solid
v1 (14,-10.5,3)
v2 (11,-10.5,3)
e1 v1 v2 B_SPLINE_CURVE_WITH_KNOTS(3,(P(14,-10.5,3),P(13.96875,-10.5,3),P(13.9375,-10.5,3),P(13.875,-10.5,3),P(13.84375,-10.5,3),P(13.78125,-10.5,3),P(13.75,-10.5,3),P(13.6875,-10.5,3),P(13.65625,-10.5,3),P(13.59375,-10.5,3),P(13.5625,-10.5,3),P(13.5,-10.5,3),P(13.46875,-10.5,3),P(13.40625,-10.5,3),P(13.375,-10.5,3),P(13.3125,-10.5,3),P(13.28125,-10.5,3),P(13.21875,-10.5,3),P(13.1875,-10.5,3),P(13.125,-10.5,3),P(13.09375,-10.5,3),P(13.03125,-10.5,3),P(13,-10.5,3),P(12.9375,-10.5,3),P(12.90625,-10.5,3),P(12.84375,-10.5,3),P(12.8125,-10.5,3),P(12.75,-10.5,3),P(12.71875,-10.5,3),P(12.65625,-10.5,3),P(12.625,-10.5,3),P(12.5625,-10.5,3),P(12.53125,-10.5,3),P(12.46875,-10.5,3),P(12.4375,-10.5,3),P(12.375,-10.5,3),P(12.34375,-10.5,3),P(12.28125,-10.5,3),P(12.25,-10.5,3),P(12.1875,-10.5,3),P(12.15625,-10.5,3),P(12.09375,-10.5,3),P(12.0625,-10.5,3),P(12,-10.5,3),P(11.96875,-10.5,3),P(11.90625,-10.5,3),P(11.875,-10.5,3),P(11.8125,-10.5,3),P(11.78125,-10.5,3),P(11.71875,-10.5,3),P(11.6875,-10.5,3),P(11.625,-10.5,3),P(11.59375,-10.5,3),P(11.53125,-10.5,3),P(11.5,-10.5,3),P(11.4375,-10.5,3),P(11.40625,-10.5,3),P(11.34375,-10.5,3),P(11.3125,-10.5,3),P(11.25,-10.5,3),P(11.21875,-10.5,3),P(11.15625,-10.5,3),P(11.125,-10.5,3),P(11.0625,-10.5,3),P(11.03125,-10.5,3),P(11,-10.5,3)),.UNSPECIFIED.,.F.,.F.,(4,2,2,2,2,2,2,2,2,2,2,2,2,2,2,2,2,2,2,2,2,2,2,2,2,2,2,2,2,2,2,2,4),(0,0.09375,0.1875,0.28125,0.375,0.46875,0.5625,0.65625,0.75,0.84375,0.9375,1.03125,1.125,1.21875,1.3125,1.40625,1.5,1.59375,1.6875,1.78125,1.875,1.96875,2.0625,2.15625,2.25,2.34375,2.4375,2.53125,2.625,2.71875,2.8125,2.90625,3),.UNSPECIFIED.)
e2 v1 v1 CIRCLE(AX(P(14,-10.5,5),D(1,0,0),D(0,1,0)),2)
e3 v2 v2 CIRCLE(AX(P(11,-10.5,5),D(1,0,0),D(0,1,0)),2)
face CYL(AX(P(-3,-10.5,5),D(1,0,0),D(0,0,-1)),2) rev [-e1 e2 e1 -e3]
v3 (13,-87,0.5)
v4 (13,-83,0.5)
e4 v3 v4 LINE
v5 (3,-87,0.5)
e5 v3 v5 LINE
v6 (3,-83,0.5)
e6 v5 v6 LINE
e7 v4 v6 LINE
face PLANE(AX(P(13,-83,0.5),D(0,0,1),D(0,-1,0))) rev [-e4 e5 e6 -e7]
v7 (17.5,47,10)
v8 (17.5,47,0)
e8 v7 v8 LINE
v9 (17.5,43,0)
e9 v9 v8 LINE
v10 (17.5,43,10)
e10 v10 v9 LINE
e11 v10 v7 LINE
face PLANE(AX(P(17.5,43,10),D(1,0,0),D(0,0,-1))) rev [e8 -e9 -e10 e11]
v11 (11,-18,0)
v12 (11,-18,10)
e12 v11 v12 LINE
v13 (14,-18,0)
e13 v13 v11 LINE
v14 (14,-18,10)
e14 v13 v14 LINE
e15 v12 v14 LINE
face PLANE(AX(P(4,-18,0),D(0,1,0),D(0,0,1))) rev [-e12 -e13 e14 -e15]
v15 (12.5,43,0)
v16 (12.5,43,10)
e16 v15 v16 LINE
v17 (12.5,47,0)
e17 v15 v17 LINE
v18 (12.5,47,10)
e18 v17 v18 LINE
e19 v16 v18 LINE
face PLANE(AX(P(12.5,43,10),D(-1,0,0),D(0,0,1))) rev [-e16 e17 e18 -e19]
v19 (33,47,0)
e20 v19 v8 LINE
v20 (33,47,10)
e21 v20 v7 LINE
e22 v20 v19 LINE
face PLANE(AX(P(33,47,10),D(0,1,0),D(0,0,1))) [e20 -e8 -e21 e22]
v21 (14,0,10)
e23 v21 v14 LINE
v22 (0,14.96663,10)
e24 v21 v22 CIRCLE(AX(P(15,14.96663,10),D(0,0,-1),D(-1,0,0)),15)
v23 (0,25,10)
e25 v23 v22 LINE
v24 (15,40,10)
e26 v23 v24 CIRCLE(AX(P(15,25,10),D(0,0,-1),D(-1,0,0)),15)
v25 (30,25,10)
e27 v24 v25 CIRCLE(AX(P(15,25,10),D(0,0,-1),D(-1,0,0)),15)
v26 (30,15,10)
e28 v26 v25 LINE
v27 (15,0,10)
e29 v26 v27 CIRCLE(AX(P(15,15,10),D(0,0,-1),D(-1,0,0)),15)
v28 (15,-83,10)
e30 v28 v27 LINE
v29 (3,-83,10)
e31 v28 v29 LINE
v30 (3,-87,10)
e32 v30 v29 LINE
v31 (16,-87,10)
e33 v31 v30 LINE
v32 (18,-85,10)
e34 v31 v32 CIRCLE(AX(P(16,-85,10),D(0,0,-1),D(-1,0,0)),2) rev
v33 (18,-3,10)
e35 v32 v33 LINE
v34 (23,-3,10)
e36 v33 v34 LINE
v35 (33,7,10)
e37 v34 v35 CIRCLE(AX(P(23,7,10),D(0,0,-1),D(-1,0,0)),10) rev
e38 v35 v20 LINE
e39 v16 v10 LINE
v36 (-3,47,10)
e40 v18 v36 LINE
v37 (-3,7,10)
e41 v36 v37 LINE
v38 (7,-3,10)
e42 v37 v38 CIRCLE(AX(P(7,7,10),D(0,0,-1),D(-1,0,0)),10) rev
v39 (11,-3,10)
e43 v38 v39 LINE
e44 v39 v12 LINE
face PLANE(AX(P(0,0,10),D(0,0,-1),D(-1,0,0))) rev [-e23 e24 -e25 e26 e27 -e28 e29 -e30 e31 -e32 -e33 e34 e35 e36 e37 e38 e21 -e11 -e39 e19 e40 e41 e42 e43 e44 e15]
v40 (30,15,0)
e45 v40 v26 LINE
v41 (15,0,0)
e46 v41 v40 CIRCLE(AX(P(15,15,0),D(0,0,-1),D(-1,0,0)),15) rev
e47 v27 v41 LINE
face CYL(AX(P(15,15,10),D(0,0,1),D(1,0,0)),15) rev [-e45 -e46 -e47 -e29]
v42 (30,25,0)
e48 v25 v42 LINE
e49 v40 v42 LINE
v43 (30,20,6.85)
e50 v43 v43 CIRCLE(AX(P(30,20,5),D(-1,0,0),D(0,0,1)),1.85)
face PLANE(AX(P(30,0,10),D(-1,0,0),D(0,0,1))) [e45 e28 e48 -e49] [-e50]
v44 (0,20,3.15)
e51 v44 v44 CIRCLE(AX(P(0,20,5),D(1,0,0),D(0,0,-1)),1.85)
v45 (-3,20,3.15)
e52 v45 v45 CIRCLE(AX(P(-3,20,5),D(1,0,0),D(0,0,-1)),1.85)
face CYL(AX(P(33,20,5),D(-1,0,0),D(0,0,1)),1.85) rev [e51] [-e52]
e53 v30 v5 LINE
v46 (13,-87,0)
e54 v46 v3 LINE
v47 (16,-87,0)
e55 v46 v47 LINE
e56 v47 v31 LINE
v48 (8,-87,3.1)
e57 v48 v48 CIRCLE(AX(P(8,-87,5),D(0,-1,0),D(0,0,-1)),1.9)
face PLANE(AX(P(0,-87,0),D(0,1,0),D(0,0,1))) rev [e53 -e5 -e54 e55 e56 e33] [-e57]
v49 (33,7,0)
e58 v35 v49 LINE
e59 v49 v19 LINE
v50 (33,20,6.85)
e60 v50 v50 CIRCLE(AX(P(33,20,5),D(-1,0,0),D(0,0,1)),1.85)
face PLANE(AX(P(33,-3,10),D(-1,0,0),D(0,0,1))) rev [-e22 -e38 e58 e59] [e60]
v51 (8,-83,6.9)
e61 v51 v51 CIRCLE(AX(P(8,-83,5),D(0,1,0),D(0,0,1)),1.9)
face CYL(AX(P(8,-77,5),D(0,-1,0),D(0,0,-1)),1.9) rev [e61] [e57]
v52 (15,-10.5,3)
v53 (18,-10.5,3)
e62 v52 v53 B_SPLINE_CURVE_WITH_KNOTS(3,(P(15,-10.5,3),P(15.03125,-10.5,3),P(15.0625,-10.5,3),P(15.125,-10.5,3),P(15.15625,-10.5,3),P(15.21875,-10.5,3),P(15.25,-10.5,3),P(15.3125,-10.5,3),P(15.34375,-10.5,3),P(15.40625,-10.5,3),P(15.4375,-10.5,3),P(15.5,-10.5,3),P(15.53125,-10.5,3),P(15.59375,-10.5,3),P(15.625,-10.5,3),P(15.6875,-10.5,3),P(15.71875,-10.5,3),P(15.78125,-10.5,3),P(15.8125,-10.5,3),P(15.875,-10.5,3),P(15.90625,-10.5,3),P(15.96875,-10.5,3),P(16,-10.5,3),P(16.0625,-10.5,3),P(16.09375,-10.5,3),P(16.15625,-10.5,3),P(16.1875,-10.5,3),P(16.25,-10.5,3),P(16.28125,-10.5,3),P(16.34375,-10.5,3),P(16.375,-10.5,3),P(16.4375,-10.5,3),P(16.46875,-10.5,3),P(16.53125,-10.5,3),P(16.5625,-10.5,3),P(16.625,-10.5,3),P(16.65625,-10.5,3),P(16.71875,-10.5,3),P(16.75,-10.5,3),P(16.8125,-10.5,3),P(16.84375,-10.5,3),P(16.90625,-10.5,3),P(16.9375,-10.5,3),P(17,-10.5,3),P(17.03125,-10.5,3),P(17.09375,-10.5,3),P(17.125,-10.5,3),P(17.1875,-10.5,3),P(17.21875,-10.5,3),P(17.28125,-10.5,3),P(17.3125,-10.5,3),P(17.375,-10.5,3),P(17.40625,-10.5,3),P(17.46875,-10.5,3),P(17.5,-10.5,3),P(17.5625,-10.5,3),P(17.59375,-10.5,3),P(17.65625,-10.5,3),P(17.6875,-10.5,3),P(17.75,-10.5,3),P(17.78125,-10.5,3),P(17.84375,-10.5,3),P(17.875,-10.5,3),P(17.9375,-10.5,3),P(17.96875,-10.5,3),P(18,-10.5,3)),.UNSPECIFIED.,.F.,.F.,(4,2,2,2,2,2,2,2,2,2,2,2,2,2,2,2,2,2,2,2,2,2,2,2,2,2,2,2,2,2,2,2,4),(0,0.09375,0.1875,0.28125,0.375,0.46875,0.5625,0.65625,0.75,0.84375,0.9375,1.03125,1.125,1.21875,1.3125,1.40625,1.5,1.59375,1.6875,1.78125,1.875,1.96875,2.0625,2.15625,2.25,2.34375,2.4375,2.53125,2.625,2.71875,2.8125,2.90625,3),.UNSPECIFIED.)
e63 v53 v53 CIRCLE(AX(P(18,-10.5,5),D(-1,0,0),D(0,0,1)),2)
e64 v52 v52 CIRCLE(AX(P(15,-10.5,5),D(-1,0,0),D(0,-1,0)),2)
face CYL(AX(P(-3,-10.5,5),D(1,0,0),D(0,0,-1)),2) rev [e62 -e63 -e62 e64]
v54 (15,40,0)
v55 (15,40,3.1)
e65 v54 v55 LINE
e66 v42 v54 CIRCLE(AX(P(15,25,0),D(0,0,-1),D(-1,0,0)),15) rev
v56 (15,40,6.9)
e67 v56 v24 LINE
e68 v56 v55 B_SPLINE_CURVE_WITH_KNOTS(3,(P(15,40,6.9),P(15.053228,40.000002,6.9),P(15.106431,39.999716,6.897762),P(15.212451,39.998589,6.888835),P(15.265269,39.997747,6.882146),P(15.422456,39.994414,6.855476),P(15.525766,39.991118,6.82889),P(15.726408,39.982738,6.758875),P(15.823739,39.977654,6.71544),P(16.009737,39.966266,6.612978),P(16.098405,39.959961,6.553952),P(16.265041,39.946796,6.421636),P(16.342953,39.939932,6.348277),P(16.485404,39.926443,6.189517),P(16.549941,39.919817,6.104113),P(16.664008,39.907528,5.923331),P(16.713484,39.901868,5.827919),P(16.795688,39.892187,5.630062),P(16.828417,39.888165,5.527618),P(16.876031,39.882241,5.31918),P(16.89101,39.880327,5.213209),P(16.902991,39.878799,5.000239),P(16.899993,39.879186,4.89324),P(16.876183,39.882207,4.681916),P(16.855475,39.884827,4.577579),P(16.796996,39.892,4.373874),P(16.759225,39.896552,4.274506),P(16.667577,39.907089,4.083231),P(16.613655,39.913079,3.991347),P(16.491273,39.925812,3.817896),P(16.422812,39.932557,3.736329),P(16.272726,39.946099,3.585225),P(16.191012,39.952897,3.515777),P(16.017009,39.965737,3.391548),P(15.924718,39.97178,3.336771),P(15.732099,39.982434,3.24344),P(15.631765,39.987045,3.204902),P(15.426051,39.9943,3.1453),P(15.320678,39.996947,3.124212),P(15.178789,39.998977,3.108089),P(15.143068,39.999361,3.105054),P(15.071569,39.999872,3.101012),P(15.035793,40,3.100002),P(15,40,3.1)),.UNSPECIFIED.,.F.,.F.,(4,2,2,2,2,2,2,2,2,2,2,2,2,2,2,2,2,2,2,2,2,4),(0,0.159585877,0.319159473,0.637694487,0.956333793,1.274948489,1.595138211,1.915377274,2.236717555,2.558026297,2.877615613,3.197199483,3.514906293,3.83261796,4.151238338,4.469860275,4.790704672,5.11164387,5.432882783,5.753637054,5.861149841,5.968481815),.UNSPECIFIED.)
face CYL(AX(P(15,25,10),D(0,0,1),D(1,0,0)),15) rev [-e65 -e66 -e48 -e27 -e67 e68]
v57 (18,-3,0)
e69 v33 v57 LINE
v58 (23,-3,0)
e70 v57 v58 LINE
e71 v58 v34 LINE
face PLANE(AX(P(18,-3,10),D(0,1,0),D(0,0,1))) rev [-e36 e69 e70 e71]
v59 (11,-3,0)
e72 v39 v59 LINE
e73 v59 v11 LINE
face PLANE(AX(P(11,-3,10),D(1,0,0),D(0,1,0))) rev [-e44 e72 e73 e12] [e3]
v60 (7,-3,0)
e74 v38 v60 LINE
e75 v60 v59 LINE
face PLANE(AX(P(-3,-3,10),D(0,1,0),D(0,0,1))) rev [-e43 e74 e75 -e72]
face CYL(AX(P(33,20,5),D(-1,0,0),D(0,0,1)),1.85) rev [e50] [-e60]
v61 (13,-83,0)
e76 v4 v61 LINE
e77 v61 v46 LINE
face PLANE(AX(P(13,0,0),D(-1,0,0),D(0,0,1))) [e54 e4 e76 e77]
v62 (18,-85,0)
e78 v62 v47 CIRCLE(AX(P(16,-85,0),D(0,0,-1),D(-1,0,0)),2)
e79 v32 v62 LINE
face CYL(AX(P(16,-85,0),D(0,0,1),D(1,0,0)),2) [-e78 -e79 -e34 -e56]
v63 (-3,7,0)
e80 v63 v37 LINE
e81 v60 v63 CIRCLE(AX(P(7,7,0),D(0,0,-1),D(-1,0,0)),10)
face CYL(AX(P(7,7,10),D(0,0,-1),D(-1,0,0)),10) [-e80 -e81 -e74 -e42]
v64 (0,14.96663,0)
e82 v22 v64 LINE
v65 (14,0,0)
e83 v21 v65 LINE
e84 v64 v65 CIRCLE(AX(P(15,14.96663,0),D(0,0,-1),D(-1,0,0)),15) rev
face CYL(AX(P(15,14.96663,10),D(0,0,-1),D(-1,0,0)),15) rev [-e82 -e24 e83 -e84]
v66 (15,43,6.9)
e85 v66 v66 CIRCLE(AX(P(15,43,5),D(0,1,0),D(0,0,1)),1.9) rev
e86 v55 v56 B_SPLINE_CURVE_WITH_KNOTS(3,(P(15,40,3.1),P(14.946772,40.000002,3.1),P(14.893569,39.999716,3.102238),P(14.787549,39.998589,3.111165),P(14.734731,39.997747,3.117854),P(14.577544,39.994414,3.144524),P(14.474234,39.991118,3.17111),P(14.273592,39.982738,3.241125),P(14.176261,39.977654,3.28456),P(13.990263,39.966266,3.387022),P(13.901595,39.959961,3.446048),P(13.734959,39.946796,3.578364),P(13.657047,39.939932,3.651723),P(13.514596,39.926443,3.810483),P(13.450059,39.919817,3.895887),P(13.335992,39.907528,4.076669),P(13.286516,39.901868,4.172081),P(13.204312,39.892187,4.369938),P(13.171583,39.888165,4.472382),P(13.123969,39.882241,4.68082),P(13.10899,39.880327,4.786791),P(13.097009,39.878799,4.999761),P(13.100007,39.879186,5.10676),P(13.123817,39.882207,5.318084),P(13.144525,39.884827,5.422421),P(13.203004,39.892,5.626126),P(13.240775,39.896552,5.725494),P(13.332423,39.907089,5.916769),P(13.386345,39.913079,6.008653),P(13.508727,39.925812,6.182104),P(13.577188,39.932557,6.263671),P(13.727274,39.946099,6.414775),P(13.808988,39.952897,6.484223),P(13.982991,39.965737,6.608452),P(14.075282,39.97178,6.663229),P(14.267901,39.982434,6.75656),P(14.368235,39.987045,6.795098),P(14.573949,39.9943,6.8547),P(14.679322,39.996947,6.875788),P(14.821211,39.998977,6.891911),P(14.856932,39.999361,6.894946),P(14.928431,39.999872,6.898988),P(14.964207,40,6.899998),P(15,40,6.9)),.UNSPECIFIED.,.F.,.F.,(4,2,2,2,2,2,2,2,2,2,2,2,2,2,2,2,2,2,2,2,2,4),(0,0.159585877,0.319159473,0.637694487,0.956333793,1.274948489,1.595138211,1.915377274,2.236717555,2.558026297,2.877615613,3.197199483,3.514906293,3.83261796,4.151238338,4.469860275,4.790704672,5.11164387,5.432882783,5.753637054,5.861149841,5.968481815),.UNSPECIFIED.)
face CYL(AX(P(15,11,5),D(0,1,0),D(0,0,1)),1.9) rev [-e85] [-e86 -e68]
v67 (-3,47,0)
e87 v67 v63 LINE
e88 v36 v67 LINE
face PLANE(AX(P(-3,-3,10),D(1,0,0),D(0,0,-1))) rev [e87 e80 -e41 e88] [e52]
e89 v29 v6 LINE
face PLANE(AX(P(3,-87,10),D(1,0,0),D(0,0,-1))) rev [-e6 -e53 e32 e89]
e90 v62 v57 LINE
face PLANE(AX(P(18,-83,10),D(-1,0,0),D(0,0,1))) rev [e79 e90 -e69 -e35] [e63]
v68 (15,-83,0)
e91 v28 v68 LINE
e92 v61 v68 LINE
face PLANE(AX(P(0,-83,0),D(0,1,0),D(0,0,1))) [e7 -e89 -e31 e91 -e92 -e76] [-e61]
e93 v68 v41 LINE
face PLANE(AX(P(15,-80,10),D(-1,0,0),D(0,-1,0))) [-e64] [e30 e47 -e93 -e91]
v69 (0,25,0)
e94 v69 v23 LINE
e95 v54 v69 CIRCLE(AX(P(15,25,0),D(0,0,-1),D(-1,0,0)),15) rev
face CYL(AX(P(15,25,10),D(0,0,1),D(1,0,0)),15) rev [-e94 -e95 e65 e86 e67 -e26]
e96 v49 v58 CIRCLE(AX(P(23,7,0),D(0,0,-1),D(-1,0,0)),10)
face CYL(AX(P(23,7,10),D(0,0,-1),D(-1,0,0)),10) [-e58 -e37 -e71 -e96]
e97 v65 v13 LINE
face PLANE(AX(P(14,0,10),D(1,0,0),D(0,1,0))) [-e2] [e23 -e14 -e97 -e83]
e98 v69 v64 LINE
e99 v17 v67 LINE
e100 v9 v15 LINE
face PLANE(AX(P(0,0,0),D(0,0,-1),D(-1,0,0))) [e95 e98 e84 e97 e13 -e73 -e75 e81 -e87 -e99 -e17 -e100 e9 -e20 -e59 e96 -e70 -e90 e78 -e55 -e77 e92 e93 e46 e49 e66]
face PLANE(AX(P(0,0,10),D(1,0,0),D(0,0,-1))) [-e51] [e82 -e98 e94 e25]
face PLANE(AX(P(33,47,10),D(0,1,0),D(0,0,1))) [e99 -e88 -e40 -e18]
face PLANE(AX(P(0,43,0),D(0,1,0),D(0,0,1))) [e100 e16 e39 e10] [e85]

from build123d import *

# Parameters (mm, degrees)
BOSS_EXTRUDE2_DEPTH      = 10
CUT_EXTRUDE2_DEPTH       = 90.877694674
CUT_EXTRUDE2_DEPTH_BACK  = 90.877694674
SKETCH5_W                = 11
SKETCH5_H                = 67.407766248
CUT_EXTRUDE3_DEPTH       = 87.446515257
CUT_EXTRUDE3_DEPTH_BACK  = 87.446515257
SKETCH16_R               = 1.85
FILLET16_R               = 15
CUT_EXTRUDE20_DEPTH      = 92.021975369
CUT_EXTRUDE20_DEPTH_BACK = 92.021975369
SKETCH45_R               = 1.85
SKETCH52_W               = 15
SKETCH52_H               = 10
BOSS_EXTRUDE25_DEPTH     = 4
FILLET17_R               = 10
FILLET18_R               = 2
SKETCH53_R               = 1.9
CUT_EXTRUDE25_DEPTH      = 10
SKETCH55_W               = 0.5
SKETCH55_H               = 4
CUT_EXTRUDE28_DEPTH      = 10
SKETCH56_W               = 10
SKETCH56_H               = 4
BOSS_EXTRUDE26_DEPTH     = 36
SKETCH57_R               = 1.9
CUT_EXTRUDE29_DEPTH      = 36
SKETCH59_W               = 5
SKETCH59_H               = 10
CUT_EXTRUDE31_DEPTH      = 4
CUT_EXTRUDE32_DEPTH      = 91.05553843
CUT_EXTRUDE32_DEPTH_BACK = 91.05553843
SKETCH60_R               = 2


with BuildPart() as part:
    # Sketch2 → Boss-Extrude2 (new body)
    with BuildSketch(Plane.XY):
        Polygon((18, -3), (33, -3), (33, 43), (-3, 43), (-3, -3), (11, -3), (11, -83), (18, -83), align=None)
        Polygon((15, 0), (30, 0), (30, 40), (0, 40), (0, 0), (14, 0), (14, -80), (15, -80), align=None, mode=Mode.SUBTRACT)
    extrude(amount=BOSS_EXTRUDE2_DEPTH)

    # Sketch5 → Cut-Extrude2 (cut, two sides: drawn at the far end of the back side and taken through both)
    with BuildSketch(Plane.XY.offset(10).offset(-CUT_EXTRUDE2_DEPTH_BACK)):
        with Locations((9.5, -51.703883124)):
            Rectangle(SKETCH5_W, SKETCH5_H)
    extrude(amount=CUT_EXTRUDE2_DEPTH + CUT_EXTRUDE2_DEPTH_BACK, mode=Mode.SUBTRACT)

    # Sketch16 → Cut-Extrude3 (cut, two sides: drawn at the far end of the back side and taken through both)
    with BuildSketch(Plane.ZY.offset(-11).offset(-CUT_EXTRUDE3_DEPTH_BACK)):
        with Locations((5, -10.5)):
            Circle(SKETCH16_R)
    extrude(amount=CUT_EXTRUDE3_DEPTH + CUT_EXTRUDE3_DEPTH_BACK, mode=Mode.SUBTRACT)

    # Fillet16
    # the kernel refuses this fillet: 15 mm, written as the material it adds along each edge
    with BuildSketch(Plane(origin=(0, 40, 0), x_dir=(0, -1, 0), z_dir=(0, 0, 1)), Plane(origin=(30, 40, 0), x_dir=(-1, 0, 0), z_dir=(0, 0, 1)), Plane(origin=(30, 0, 0), x_dir=(0, 1, 0), z_dir=(0, 0, 1))) as fillet16_piece_1:
        with BuildLine():
            CenterArc((FILLET16_R, FILLET16_R), FILLET16_R, 180, 90)
            Line((0, FILLET16_R), (-FILLET16_R * 0.02, FILLET16_R))
            Line((-FILLET16_R * 0.02, FILLET16_R), (-FILLET16_R * 0.02, -FILLET16_R * 0.02))
            Line((-FILLET16_R * 0.02, -FILLET16_R * 0.02), (FILLET16_R, -FILLET16_R * 0.02))
            Line((FILLET16_R, -FILLET16_R * 0.02), (FILLET16_R, 0))
        make_face()
    extrude(amount=10)
    with BuildSketch(Plane(origin=(0, 0, 0), x_dir=(1, 0, 0), z_dir=(0, 0, 1))) as fillet16_piece_2:
        with BuildLine():
            CenterArc((15, 14.966629547), FILLET16_R, 180, 86.177446271)
            Line((0, 14.966629547), (-0.3, 14.966629547))
            Line((-0.3, 14.966629547), (-0.3, 0))
            Line((-0.3, 0), (0, -0.3))
            ThreePointArc((0, -0.3), (7, -0.3), (13.98, -0.299332591))
            Line((13.98, -0.299332591), (14, 0))
        make_face()
    extrude(amount=10)

    # Sketch45 → Cut-Extrude20 (cut, two sides: drawn at the far end of the back side and taken through both)
    with BuildSketch(Plane.ZY.offset(3).offset(-CUT_EXTRUDE20_DEPTH_BACK)):
        with Locations((5, 20)):
            Circle(SKETCH45_R)
    extrude(amount=CUT_EXTRUDE20_DEPTH + CUT_EXTRUDE20_DEPTH_BACK, mode=Mode.SUBTRACT)

    # Sketch52 → Boss-Extrude25 (add)
    with BuildSketch(Plane.XZ.offset(83)):
        with Locations((10.5, 5)):
            Rectangle(SKETCH52_W, SKETCH52_H)
    extrude(amount=BOSS_EXTRUDE25_DEPTH)

    # Fillet17
    fillet17_edges = [part.edges().sort_by_distance(p)[0] for p in [
        (-3, -3, 5),
        (33, -3, 5),
    ]]
    fillet(fillet17_edges, radius=FILLET17_R)

    # Fillet18
    fillet18_edges = [part.edges().sort_by_distance(p)[0] for p in [
        (18, -87, 5),
    ]]
    fillet(fillet18_edges, radius=FILLET18_R)

    # Sketch53 → Cut-Extrude25 (cut)
    with BuildSketch(Plane.XZ.offset(87)):
        with Locations(Location((8, 5, 0), (0, 0, 270))):
            Circle(SKETCH53_R)
    extrude(amount=-CUT_EXTRUDE25_DEPTH, mode=Mode.SUBTRACT)

    # Sketch55 → Cut-Extrude28 (cut)
    with BuildSketch(Plane.ZY.offset(-3)):
        with Locations((0.25, -85)):
            Rectangle(SKETCH55_W, SKETCH55_H)
    extrude(amount=-CUT_EXTRUDE28_DEPTH, mode=Mode.SUBTRACT)

    # Sketch56 → Boss-Extrude26 (add)
    with BuildSketch(Plane.ZY.offset(3)):
        with Locations((5, 45)):
            Rectangle(SKETCH56_W, SKETCH56_H)
    extrude(amount=-BOSS_EXTRUDE26_DEPTH)

    # Sketch57 → Cut-Extrude29 (cut)
    with BuildSketch(Plane(origin=(0, 47, 0), x_dir=(1, 0, 0), z_dir=(0, 1, 0))):
        with Locations(Location((15, -5, 0), (0, 0, 270))):
            Circle(SKETCH57_R)
    extrude(amount=-CUT_EXTRUDE29_DEPTH, mode=Mode.SUBTRACT)

    # Sketch59 → Cut-Extrude31 (cut)
    with BuildSketch(Plane(origin=(0, 47, 0), x_dir=(1, 0, 0), z_dir=(0, 1, 0))):
        with Locations((15, -5)):
            Rectangle(SKETCH59_W, SKETCH59_H)
    extrude(amount=-CUT_EXTRUDE31_DEPTH, mode=Mode.SUBTRACT)

    # Sketch60 → Cut-Extrude32 (cut, two sides: drawn at the far end of the back side and taken through both)
    with BuildSketch(Plane(origin=(18, 0, 0), x_dir=(0, 0, -1), z_dir=(1, 0, 0)).offset(-CUT_EXTRUDE32_DEPTH_BACK)):
        with Locations((-5, -10.5)):
            Circle(SKETCH60_R)
    extrude(amount=CUT_EXTRUDE32_DEPTH + CUT_EXTRUDE32_DEPTH_BACK, mode=Mode.SUBTRACT)


solid = part.part
